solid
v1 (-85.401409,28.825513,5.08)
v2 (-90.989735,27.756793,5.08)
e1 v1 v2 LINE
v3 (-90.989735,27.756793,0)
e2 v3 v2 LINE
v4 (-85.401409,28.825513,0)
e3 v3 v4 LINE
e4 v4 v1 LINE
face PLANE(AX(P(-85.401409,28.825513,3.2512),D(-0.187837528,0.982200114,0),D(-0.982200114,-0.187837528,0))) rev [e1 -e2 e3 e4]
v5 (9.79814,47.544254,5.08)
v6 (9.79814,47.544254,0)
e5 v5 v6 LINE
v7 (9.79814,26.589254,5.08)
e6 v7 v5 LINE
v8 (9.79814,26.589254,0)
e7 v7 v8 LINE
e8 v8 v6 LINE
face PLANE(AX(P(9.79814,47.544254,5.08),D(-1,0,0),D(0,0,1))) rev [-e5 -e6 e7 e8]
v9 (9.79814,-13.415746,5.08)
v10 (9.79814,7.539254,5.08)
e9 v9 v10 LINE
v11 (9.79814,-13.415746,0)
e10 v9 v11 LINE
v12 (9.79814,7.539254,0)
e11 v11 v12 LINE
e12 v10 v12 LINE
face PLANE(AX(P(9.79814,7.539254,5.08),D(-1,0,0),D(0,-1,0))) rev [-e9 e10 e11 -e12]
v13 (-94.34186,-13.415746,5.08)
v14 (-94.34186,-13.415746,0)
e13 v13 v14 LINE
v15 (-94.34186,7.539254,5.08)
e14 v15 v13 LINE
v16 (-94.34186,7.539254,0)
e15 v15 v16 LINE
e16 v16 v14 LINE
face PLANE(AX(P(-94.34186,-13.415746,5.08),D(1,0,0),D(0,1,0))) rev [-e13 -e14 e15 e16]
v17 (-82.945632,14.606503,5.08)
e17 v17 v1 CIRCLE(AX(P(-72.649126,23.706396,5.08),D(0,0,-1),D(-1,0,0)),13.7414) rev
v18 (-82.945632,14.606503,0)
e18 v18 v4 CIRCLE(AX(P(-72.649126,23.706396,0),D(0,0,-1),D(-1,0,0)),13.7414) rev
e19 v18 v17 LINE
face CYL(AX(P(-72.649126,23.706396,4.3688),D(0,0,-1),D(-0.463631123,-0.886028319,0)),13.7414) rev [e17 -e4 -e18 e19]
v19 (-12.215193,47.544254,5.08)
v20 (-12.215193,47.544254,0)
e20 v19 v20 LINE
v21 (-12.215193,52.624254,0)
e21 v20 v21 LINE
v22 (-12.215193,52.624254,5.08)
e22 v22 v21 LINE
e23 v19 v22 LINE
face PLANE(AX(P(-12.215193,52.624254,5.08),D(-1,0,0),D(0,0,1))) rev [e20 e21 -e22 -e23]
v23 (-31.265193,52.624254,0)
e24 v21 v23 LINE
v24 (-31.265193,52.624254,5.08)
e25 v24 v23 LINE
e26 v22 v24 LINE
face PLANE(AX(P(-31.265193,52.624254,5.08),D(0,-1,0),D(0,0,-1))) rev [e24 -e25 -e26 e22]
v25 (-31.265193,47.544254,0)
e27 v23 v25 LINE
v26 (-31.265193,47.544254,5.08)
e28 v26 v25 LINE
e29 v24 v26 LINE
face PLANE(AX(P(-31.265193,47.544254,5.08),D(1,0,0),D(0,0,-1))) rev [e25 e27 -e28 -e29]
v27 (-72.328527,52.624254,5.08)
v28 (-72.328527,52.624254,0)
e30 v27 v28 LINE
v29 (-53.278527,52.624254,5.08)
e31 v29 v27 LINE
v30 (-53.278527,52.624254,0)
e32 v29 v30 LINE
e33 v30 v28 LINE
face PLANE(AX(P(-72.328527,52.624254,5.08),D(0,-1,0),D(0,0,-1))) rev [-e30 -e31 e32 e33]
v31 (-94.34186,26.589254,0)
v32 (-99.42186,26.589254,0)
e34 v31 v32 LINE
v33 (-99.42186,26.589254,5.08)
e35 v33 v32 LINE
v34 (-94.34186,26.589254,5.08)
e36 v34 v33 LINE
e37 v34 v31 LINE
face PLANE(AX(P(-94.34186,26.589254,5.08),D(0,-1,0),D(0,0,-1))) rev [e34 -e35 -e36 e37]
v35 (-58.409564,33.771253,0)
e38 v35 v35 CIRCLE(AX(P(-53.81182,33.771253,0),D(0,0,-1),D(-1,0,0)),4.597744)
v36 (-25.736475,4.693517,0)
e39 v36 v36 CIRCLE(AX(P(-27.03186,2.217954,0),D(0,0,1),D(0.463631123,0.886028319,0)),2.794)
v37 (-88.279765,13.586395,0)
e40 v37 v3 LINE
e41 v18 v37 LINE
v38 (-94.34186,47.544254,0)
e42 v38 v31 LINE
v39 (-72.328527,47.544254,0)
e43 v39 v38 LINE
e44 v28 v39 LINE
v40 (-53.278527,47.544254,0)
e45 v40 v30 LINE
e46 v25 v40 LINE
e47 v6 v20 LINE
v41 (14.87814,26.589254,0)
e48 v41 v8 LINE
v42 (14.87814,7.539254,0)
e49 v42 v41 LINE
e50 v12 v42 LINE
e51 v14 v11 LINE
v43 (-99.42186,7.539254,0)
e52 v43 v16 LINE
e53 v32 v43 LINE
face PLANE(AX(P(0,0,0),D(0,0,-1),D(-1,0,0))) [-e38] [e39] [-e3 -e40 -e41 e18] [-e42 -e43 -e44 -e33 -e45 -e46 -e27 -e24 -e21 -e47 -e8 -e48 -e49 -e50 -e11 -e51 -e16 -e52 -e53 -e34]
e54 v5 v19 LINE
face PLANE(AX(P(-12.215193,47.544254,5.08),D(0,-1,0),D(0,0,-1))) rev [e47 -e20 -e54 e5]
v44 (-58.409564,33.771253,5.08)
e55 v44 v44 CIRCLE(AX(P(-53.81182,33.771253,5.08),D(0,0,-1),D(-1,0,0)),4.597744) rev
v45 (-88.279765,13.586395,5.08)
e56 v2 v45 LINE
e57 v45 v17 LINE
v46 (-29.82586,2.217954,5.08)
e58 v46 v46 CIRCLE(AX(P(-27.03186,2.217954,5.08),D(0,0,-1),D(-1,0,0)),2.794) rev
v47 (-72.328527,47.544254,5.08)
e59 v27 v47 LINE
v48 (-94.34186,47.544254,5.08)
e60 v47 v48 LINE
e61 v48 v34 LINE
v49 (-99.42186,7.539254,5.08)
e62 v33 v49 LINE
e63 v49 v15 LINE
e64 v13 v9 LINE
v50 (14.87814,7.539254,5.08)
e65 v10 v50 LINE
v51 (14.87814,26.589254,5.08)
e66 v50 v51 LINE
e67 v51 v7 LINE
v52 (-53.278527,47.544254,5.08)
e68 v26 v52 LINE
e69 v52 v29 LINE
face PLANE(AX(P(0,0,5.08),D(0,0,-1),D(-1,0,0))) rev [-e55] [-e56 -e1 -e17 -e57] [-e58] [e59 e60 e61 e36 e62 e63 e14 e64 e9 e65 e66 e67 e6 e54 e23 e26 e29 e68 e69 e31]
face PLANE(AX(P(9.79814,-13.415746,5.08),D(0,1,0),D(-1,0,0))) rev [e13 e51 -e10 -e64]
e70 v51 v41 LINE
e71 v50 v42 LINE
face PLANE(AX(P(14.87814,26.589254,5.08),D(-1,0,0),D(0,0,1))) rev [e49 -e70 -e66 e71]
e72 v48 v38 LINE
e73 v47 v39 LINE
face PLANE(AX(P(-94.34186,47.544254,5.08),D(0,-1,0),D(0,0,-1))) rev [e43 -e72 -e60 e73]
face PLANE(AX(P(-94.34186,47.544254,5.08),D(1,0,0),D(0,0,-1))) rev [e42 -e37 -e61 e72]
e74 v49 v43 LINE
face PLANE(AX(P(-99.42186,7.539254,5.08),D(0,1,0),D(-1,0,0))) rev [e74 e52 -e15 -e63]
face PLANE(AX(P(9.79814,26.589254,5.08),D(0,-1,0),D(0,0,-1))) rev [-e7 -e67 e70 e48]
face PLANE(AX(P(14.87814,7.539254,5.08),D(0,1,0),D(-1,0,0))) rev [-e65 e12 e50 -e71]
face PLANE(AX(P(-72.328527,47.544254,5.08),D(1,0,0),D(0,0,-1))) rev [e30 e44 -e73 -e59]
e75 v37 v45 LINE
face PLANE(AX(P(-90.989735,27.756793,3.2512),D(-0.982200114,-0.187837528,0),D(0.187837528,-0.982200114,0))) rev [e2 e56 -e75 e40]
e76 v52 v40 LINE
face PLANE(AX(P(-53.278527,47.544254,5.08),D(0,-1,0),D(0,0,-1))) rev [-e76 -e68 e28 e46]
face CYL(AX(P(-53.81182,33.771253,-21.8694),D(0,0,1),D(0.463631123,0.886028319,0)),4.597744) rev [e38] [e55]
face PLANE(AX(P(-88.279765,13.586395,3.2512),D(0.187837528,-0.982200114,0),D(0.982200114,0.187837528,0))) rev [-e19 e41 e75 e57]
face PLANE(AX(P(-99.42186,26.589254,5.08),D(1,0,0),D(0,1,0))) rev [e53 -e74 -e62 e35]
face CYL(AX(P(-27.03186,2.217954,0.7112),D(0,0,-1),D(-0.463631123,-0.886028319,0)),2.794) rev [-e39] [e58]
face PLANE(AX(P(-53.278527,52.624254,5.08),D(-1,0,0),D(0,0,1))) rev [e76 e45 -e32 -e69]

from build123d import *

# Parameters (mm, degrees)
BOSS_EXTRUDE1_DEPTH = 5.08
CAVITY2_OUTLINE_R   = 4.59774385
CAVITY2_OUTLINE_R_2 = 13.7414
CAVITY2_DEPTH       = 4.3688
CAVITY2_START       = 3.2512
CAVITY2_2_DEPTH     = 1.1176
CAVITY2_3_OUTLINE_R = 2.794
CAVITY2_3_DEPTH     = 0.7112
SKETCH10_R          = 4.59774385
SKETCH10_R_2        = 2.794
CUT_EXTRUDE1_DEPTH  = 5.08


# Read off the part's stored shape, not the designer's step: Cavity2
with BuildPart() as part:
    # Sketch1 → Boss-Extrude1 (new body)
    with BuildSketch(Plane.XY):
        Polygon((-94.341860078, 47.544254219), (-72.328526744, 47.544254219), (-72.328526744, 52.624254219), (-53.278526744, 52.624254219), (-53.278526744, 47.544254219), (-31.265193411, 47.544254219), (-31.265193411, 52.624254219), (-12.215193411, 52.624254219), (-12.215193411, 47.544254219), (9.798139922, 47.544254219), (9.798139922, 26.589254219), (14.878139922, 26.589254219), (14.878139922, 7.539254219), (9.798139922, 7.539254219), (9.798139922, -13.415745781), (-94.341860078, -13.415745781), (-94.341860078, 7.539254219), (-99.421860078, 7.539254219), (-99.421860078, 26.589254219), (-94.341860078, 26.589254219), align=None)
    extrude(amount=BOSS_EXTRUDE1_DEPTH)

    # Cavity2 outline → Cavity2 (cut)
    with BuildSketch(Plane.XY):
        with Locations((-53.811820296, 33.77125273)):
            Circle(CAVITY2_OUTLINE_R)
        with Locations((-72.649126193, 23.706396)):
            Circle(CAVITY2_OUTLINE_R_2)
    extrude(amount=CAVITY2_DEPTH, mode=Mode.SUBTRACT)

    # Cavity2 2 outline → Cavity2 2 (cut)
    with BuildSketch(Plane.XY.offset(CAVITY2_START)):
        with BuildLine():
            Line((-85.401408895, 28.825513097), (-90.989734661, 27.7567927))
            Line((-90.989734661, 27.7567927), (-88.279765083, 13.586395221))
            Line((-88.279765083, 13.586395221), (-82.945631867, 14.606503426))
            ThreePointArc((-82.945631867, 14.606503426), (-86.190053798, 21.367731092), (-85.401408895, 28.825513097))
        make_face()
    extrude(amount=CAVITY2_2_DEPTH, mode=Mode.SUBTRACT)

    # Cavity2 3 outline → Cavity2 3 (cut)
    with BuildSketch(Plane.XY):
        with Locations((-27.031860078, 2.217954219)):
            Circle(CAVITY2_3_OUTLINE_R)
    extrude(amount=CAVITY2_3_DEPTH, mode=Mode.SUBTRACT)

    # Sketch10 → Cut-Extrude1 (cut)
    with BuildSketch(Plane(origin=(0, 0, 0), x_dir=(-1, 0, 0), z_dir=(0, 0, -1))):
        with Locations((53.811820296, 33.77125273)):
            Circle(SKETCH10_R)
        with Locations((27.031860078, 2.217954219)):
            Circle(SKETCH10_R_2)
        with BuildLine():
            Line((82.945631867, 14.606503426), (88.279765083, 13.586395221))
            Line((88.279765083, 13.586395221), (90.989734661, 27.7567927))
            Line((90.989734661, 27.7567927), (85.401408894, 28.825513097))
            ThreePointArc((85.401408894, 28.825513097), (59.108198587, 26.045060907), (82.945631867, 14.606503426))
        make_face()
    extrude(amount=-CUT_EXTRUDE1_DEPTH, mode=Mode.SUBTRACT)


solid = part.part
